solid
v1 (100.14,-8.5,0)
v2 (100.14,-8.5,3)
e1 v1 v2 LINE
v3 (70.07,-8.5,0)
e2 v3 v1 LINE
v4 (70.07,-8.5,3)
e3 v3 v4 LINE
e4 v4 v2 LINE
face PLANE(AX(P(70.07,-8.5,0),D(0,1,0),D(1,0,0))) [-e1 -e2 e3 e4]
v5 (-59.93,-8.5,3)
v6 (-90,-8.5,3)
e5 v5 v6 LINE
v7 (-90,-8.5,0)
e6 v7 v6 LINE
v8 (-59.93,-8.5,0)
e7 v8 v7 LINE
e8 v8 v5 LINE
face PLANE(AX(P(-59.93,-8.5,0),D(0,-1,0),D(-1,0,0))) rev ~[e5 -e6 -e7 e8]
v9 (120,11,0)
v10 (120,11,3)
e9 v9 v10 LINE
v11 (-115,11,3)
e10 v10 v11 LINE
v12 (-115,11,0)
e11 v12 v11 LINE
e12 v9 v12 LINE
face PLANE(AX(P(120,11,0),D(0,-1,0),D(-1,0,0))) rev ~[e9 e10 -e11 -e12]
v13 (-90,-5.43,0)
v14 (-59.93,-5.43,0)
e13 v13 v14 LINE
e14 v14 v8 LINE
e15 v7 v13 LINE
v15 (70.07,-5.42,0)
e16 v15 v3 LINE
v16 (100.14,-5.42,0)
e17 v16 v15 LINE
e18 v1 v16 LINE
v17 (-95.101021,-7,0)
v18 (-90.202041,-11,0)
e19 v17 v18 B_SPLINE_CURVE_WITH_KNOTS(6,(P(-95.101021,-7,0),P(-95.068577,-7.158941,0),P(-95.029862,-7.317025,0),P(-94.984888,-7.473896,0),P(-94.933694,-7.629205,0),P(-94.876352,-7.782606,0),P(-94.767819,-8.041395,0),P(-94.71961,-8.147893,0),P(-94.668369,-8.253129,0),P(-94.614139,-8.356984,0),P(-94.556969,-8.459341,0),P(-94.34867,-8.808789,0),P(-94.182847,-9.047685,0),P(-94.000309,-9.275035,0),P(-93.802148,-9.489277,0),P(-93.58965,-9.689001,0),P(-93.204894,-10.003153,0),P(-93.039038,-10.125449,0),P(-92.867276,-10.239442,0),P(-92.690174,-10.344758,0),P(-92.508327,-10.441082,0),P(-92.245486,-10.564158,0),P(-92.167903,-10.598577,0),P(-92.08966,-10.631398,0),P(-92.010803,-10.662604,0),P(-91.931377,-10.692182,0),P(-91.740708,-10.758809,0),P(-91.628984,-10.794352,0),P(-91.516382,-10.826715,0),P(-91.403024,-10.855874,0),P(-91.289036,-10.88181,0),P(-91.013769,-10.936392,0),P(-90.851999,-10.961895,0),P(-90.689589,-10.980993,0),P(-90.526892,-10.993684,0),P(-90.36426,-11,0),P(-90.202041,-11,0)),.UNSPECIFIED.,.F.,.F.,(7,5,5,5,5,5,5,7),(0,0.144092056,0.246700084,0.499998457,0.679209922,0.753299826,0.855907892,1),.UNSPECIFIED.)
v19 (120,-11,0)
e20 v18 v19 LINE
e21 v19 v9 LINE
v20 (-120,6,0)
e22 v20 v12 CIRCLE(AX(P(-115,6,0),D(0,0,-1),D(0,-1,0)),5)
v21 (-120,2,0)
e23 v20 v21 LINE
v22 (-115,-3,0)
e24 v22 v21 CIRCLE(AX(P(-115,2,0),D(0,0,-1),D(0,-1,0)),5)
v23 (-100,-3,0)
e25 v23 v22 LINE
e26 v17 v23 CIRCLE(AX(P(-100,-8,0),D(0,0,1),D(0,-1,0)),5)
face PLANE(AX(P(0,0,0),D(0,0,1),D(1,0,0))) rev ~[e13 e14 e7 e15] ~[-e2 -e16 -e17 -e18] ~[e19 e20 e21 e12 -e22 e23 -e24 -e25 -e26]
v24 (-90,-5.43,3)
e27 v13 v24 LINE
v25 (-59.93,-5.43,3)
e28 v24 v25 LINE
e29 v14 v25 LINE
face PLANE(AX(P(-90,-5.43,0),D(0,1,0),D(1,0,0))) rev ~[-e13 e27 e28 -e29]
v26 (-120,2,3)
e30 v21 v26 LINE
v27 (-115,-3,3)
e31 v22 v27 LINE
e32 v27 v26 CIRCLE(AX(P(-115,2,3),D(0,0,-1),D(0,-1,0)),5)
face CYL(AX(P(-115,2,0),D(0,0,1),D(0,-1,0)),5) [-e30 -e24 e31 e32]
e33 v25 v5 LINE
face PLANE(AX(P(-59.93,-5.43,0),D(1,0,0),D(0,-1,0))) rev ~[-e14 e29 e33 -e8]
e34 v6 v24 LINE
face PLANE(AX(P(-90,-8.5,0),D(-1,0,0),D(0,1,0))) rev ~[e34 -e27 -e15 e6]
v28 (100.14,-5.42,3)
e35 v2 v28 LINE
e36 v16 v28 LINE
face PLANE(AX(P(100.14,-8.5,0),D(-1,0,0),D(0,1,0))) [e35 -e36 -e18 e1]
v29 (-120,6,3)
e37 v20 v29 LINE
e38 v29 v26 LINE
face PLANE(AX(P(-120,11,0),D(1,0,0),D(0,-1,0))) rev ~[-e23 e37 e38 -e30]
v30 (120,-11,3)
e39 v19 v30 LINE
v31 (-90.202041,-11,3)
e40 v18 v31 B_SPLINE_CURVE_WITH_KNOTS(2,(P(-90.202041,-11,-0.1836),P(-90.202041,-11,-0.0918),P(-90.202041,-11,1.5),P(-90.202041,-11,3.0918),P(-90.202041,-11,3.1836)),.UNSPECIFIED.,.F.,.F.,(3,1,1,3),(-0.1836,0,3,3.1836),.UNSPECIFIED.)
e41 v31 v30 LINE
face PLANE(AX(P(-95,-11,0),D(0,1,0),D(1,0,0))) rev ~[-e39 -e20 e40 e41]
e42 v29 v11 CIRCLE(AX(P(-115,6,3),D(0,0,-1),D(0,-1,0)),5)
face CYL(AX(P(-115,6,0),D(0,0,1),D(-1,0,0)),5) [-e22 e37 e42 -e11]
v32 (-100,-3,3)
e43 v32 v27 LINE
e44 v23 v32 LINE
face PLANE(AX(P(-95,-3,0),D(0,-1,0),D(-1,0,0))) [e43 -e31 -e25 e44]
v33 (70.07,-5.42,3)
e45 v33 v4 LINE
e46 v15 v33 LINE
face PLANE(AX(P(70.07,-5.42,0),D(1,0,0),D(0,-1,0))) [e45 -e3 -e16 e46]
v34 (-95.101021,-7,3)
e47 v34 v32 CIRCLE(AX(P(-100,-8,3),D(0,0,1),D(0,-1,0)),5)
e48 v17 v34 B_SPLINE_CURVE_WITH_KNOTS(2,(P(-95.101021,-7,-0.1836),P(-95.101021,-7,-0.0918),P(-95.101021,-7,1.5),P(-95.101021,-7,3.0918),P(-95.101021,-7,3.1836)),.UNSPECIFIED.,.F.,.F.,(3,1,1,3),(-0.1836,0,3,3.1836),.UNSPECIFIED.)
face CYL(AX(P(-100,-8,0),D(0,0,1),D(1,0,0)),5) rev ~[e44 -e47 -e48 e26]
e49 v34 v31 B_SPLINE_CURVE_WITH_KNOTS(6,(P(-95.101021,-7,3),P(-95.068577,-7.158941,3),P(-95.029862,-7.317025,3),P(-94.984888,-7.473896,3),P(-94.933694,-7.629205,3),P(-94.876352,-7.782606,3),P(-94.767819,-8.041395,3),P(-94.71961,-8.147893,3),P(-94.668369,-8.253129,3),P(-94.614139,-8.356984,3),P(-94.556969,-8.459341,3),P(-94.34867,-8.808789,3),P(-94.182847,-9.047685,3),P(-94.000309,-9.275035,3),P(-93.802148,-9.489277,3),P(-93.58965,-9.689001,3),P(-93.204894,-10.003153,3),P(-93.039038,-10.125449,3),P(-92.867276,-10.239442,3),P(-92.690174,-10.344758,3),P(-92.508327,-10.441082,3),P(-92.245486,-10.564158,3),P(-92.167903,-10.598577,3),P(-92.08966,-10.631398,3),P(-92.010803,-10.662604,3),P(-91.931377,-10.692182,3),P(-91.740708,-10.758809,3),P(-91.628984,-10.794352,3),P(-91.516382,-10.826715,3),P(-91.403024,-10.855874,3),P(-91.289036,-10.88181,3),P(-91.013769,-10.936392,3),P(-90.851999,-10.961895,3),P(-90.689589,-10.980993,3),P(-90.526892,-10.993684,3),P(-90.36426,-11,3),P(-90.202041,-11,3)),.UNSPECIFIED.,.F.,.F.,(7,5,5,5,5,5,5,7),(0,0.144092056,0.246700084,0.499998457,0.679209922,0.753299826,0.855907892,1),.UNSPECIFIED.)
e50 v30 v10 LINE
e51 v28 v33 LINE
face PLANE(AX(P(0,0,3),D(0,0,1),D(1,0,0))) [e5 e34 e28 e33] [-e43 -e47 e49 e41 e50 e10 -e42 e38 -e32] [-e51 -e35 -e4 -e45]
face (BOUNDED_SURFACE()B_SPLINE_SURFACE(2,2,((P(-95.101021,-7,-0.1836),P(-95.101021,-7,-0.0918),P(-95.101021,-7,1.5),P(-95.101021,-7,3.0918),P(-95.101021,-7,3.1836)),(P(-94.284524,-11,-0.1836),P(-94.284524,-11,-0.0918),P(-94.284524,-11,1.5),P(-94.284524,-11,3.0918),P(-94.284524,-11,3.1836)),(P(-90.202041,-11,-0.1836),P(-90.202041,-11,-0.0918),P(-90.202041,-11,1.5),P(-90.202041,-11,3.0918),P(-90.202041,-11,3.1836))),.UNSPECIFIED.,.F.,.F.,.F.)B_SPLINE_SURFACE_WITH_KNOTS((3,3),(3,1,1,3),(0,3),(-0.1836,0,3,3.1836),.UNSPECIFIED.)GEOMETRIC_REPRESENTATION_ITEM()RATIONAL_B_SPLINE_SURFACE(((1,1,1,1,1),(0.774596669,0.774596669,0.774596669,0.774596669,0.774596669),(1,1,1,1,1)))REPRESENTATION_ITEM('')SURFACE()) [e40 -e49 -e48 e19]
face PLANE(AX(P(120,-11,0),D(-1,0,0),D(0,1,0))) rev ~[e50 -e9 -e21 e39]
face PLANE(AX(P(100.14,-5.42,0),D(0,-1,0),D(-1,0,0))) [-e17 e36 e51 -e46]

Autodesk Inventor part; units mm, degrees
ref_plane "YZ Plane" through (0, 0, 0) normal (1, 0, 0) x (0, 1, 0)
ref_plane "XZ Plane" through (0, 0, 0) normal (0, 1, 0) x (-1, 0, 0)
ref_plane "XY Plane" through (0, 0, 0) normal (0, 0, 1) x (1, 0, 0)
sketch "Sketch1" plane through (0, 0, 0) normal (0, 0, 1) x (1, 0, 0)
  line L0 (-120, -11) -> (120, -11)
  line L1 (120, -11) -> (120, 11)
  line L2 (120, 11) -> (-120, 11)
  line L3 (-120, 11) -> (-120, -11)
  line L4 (-120, -11) -> (120, 11) construction
  line L5 (120, -11) -> (-120, 11) construction
  line L6 (-90, -5.43) -> (-59.93, -5.43)
  line L7 (-59.93, -5.43) -> (-59.93, -8.5)
  line L8 (-59.93, -8.5) -> (-90, -8.5)
  line L9 (-90, -8.5) -> (-90, -5.43)
  line L10 (-90, -5.43) -> (-59.93, -8.5) construction
  line L11 (-59.93, -5.43) -> (-90, -8.5) construction
  line L12 (100.14, -5.42) -> (70.07, -5.42)
  line L13 (70.07, -5.42) -> (70.07, -8.5)
  line L14 (70.07, -8.5) -> (100.14, -8.5)
  line L15 (100.14, -8.5) -> (100.14, -5.42)
  line L16 (100.14, -5.42) -> (70.07, -8.5) construction
  line L17 (70.07, -5.42) -> (100.14, -8.5) construction
  line L18 (-120, -11) -> (-95, -11)
  line L19 (-95, -11) -> (-95, -3)
  line L20 (-95, -3) -> (-120, -3)
  line L21 (-120, -3) -> (-120, -11)
  point P0 (0, 0)
  point P1 (-74.965, -6.965)
  point P2 (85.105, -6.96)
  point P3 (-95, -11)
  dimension "d0" = 240
  dimension "d1" = 22
  dimension "d2" = 30.07
  dimension "d3" = 3.07
  dimension "d4" = 2.5
  dimension "d5" = 30
  dimension "d6" = 30.07
  dimension "d7" = 3.08
  dimension "d8" = 2.5
  dimension "d9" = 130
  dimension "d12" = 25
  dimension "d13" = 8
extrude "Plate1" add sketch "Sketch1" along normal blind 3 contours L19 L20 L3 L2 L1 L0
fillet "Corner Round1" radius 5 4 edges at (-120, 11, 1.5) (-120, -3, 1.5) (-95, -3, 1.5) (-95, -11, 1.5)
equation "\"d10\" = Thickness"
equation "\"BendRadius\" = Thickness"
equation "\"BendReliefWidth\" = Thickness"
equation "\"BendReliefDepth\" = 0.5 * Thickness"
equation "\"CornerReliefSize\" = 4 * Thickness"
equation "\"MinimumRemnant\" = 2 * Thickness"
equation "\"TransitionRadius\" = BendRadius"
equation "\"JacobiRadiusSize\" = BendRadius"
equation "\"GapSize\" = Thickness"
equation "\"Thickness\" = 3"
properties part number "Starting Path Wall"
